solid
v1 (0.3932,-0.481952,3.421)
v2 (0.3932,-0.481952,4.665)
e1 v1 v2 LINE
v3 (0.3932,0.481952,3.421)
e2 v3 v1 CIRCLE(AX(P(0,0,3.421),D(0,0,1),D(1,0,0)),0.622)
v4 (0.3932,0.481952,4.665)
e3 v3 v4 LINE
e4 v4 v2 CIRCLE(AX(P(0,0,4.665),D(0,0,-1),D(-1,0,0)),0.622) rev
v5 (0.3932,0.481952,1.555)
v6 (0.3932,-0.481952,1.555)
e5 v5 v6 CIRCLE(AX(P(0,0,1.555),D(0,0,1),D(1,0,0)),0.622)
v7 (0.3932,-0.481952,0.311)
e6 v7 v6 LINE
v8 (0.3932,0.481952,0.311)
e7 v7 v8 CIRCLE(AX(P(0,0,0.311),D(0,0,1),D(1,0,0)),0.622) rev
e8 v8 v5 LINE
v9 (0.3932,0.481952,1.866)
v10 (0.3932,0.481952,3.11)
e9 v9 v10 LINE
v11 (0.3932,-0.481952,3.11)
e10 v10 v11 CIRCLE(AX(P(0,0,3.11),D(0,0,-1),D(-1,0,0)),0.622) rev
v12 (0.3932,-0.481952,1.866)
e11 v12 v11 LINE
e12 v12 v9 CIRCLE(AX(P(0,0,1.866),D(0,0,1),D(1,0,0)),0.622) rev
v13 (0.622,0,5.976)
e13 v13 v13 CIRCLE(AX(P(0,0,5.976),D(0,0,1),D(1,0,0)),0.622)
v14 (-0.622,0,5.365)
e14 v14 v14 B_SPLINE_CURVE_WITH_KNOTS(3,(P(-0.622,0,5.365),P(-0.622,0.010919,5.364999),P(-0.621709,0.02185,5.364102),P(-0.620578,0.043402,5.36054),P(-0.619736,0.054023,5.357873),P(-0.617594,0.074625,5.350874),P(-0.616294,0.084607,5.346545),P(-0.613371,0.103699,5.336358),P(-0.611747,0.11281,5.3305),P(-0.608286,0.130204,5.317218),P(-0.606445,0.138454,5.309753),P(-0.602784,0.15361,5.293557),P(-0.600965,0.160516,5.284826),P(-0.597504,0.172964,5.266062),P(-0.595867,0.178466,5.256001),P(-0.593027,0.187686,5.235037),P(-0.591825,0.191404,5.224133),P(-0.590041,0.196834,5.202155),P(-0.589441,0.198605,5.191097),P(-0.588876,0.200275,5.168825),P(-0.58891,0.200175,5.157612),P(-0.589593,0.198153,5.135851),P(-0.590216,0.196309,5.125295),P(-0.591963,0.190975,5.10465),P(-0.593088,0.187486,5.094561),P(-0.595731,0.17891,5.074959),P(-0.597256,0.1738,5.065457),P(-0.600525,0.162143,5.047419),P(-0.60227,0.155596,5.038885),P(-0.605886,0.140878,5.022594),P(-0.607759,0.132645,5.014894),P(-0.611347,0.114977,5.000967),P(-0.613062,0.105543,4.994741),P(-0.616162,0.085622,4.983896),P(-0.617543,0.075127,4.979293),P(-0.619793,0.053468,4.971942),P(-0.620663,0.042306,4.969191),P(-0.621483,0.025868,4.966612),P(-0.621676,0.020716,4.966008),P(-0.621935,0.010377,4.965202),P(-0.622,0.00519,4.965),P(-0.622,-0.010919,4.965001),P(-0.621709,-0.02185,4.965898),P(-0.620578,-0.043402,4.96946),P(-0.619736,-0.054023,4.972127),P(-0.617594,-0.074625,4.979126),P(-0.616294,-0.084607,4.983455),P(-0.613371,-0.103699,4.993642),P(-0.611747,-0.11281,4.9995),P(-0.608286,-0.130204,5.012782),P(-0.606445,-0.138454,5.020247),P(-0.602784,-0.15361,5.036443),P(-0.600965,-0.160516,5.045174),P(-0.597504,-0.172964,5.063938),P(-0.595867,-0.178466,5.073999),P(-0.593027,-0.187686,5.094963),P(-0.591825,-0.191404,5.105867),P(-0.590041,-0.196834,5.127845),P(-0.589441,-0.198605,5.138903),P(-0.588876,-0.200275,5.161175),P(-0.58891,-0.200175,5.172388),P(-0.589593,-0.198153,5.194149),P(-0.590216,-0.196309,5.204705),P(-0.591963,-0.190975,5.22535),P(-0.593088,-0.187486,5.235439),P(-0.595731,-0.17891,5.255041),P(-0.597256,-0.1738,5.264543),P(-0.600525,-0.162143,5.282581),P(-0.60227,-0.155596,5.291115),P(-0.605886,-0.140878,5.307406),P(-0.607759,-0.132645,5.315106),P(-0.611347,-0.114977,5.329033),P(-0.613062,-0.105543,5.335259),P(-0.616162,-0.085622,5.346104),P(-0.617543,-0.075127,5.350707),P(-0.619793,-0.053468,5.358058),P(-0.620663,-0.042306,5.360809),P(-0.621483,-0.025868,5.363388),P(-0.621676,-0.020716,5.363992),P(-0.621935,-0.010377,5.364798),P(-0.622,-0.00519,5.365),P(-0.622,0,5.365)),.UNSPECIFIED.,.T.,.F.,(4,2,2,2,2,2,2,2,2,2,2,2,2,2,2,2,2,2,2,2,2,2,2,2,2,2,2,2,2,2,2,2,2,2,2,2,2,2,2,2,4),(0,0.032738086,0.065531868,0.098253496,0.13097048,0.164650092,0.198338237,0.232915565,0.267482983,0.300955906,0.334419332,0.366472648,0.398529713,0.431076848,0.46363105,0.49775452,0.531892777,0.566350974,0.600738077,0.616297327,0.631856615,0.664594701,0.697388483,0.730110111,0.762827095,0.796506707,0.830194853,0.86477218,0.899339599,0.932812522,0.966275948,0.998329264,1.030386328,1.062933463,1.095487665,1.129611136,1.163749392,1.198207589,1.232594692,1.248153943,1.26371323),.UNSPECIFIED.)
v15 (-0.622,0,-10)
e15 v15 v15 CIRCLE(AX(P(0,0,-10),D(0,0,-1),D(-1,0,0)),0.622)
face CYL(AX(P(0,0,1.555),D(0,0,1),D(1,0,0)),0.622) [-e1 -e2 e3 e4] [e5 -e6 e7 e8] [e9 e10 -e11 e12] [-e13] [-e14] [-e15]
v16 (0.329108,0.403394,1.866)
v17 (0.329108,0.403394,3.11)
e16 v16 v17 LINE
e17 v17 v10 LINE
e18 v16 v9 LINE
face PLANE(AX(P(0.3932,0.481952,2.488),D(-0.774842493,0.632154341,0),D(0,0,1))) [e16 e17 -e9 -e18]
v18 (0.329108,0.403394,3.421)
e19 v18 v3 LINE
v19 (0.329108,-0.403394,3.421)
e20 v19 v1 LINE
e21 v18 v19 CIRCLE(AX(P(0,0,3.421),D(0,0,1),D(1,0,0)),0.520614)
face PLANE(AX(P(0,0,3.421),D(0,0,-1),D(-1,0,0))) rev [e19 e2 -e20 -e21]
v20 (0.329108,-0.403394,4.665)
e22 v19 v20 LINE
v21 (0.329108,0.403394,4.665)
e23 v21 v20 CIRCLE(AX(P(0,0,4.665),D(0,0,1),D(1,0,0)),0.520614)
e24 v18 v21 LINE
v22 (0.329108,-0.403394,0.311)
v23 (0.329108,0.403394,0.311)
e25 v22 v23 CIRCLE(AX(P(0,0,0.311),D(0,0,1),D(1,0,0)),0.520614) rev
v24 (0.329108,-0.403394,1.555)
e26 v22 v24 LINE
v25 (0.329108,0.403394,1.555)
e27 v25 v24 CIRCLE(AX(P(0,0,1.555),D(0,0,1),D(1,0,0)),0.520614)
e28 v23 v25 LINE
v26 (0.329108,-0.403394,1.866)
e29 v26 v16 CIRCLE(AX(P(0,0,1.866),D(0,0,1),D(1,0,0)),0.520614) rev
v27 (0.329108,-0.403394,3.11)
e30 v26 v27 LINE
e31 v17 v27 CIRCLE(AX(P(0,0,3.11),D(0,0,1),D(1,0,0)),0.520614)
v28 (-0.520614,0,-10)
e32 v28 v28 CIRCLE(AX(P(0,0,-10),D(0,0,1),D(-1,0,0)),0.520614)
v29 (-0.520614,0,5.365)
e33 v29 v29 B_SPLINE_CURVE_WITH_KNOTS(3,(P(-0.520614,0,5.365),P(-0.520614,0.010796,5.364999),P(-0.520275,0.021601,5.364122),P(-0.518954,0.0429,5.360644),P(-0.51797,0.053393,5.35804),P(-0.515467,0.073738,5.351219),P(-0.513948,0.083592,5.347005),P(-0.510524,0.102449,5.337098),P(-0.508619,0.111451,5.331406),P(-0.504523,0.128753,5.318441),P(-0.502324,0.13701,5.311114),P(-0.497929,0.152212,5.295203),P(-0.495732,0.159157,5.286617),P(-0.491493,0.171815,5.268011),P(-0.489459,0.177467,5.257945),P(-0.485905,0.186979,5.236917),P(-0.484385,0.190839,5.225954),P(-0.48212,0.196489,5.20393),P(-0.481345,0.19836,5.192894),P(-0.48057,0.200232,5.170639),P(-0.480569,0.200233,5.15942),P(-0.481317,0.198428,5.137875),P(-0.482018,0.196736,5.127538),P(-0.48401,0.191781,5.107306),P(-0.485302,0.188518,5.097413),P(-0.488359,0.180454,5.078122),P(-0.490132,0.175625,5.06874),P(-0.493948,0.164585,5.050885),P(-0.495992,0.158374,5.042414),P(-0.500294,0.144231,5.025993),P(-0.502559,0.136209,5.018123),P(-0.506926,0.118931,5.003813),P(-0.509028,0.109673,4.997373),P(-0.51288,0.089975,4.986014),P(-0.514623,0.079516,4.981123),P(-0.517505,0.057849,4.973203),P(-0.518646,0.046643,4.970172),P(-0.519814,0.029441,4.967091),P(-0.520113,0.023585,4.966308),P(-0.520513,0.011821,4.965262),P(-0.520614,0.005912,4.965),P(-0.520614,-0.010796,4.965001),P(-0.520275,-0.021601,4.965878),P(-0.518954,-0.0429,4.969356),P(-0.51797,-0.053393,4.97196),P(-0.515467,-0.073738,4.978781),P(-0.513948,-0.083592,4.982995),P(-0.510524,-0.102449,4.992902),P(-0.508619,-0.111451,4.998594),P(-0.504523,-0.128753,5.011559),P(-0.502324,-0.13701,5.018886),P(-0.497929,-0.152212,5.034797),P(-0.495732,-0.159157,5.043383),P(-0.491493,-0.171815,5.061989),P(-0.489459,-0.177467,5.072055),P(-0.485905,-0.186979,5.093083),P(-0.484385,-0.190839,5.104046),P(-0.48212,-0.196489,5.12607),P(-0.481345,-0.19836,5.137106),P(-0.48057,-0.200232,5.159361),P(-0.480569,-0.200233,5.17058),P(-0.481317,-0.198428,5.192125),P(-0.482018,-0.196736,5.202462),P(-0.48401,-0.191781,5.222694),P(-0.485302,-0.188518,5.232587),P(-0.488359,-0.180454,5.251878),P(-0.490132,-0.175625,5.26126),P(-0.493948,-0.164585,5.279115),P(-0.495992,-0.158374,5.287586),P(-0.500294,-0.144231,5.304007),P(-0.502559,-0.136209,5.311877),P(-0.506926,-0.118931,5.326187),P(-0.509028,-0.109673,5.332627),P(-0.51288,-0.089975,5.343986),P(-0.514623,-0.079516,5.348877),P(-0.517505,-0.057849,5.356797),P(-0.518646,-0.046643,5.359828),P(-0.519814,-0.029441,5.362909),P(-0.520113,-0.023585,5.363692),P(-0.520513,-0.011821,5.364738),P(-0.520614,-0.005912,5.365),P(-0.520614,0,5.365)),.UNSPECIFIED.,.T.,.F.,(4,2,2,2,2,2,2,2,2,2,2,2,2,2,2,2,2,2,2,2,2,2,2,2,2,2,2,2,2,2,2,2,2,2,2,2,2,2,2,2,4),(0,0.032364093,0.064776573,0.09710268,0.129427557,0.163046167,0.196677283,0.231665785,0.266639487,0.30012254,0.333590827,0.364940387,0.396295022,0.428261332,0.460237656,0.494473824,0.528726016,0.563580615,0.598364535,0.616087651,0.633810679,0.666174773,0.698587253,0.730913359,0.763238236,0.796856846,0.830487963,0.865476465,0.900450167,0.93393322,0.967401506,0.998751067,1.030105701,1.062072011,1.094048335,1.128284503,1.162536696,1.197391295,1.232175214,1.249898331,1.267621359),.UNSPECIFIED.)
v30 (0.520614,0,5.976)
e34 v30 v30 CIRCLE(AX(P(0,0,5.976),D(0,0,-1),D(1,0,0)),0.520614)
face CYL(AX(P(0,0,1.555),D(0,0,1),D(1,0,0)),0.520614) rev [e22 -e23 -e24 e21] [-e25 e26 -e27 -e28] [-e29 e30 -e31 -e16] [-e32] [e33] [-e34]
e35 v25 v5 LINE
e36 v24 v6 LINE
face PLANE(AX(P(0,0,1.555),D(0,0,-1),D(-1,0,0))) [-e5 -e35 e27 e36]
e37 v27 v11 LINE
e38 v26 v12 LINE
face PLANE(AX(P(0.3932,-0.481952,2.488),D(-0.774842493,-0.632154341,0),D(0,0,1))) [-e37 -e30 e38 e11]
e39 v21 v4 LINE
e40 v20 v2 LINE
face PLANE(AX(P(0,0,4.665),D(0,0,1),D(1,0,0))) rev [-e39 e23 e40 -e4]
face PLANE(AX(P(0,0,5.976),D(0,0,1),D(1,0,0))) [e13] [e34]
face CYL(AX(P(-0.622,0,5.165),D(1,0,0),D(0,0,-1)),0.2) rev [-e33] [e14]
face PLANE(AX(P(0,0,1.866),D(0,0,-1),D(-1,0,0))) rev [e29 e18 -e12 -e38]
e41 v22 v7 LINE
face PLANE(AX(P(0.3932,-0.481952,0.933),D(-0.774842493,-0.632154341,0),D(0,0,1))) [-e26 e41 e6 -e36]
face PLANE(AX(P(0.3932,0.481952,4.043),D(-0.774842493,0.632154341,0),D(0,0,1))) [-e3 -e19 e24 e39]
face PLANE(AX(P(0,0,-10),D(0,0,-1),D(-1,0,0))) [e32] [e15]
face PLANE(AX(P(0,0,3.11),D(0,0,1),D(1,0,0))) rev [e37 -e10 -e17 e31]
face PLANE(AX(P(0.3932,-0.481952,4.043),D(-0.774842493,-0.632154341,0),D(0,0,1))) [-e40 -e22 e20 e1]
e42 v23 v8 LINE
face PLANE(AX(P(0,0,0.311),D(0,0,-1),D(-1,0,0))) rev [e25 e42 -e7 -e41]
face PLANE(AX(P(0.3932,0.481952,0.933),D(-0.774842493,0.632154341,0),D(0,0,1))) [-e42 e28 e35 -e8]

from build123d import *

# Parameters (mm, degrees)
SURFACE_EXTRUDE1_1_DEPTH   = 1.866
SURFACE_TRIM1_TOOL_2_BACK  = 3.327
SURFACE_TRIM1_TOOL_2_DEPTH = 6.654
THICKEN2_T1                = 0.101386
LPATTERN3_COUNT            = 3
LPATTERN3_PITCH            = 1.555
BOSS_EXTRUDE1_DEPTH        = 10
BOSS_EXTRUDE2_DEPTH        = 1
SKETCH7_R                  = 0.2
CUT_EXTRUDE2_DEPTH         = 11.038613849


with BuildPart() as body_1:
    # Surface-Extrude1: a surface, the sketch's curves swept straight by 1.866 mm
    with BuildLine(Plane.XY, mode=Mode.PRIVATE) as surface_extrude1_1_path:
        ThreePointArc((0.622, 0), (0, 0.622), (-0.622, 0))
    surface_extrude1_1 = Shell.extrude(surface_extrude1_1_path.wire(), (0 * SURFACE_EXTRUDE1_1_DEPTH, 0 * SURFACE_EXTRUDE1_1_DEPTH, 1 * SURFACE_EXTRUDE1_1_DEPTH))
    # Surface-Trim1 tool: a surface, the sketch's curves swept straight by 6.654 mm
    with BuildLine(Plane(origin=(0, 0, 0), x_dir=(1, 0, 0), z_dir=(0, 1, 0)).offset(-SURFACE_TRIM1_TOOL_2_BACK), mode=Mode.PRIVATE) as surface_trim1_tool_2_path:
        Line((-0.622, -1.555), (0.3932, -1.555))
        Line((0.3932, -1.555), (0.3932, -0.311))
        Line((0.3932, -0.311), (-0.622, -0.311))
    surface_trim1_tool_2 = Shell.extrude(surface_trim1_tool_2_path.wire(), (0 * SURFACE_TRIM1_TOOL_2_DEPTH, 1 * SURFACE_TRIM1_TOOL_2_DEPTH, 0 * SURFACE_TRIM1_TOOL_2_DEPTH))
    # Surface-Trim1: the surface trimmed, the side behind the tool kept
    surface_trim1_3 = split(surface_extrude1_1.faces()[0], bisect_by=surface_trim1_tool_2, keep=Keep.BOTTOM).faces()[0]
    add(Solid.thicken(surface_trim1_3, THICKEN2_T1))


with BuildPart() as lpattern3_1:
    # LPattern3: pattern copy
    add(body_1.part.moved(Location(Vector(0, 0, 1) * (1 * LPATTERN3_PITCH))))


with BuildPart() as lpattern3_2:
    # LPattern3: pattern copy
    add(body_1.part.moved(Location(Vector(0, 0, 1) * (2 * LPATTERN3_PITCH))))


with BuildPart() as body_1_1:
    add(body_1.part)

    # Combine1: read off the stored shape, not the designer's step
    # Combine1: union LPattern3_2, LPattern3_1
    add(lpattern3_2.part)
    add(lpattern3_1.part)

    # Sketch5 → Boss-Extrude1 (add)
    with BuildSketch(Plane(origin=(0, 0, 0), x_dir=(-1, 0, 0), z_dir=(0, 0, -1))):
        with BuildLine():
            Line((-0.622, 0), (-0.520614, 0))
            ThreePointArc((-0.520614, 0), (0, 0.520614), (0.520614, 0))
            Line((0.520614, 0), (0.622, 0))
            ThreePointArc((0.622, 0), (0, 0.622), (-0.622, 0))
        make_face()
    extrude(amount=BOSS_EXTRUDE1_DEPTH)

    # Sketch6 → Boss-Extrude2 (add)
    with BuildSketch(Plane.XY.offset(4.976)):
        with BuildLine():
            Line((-0.622, 0), (-0.520614, 0))
            ThreePointArc((-0.520614, 0), (0, 0.520614), (0.520614, 0))
            Line((0.520614, 0), (0.622, 0))
            ThreePointArc((0.622, 0), (0, 0.622), (-0.622, 0))
        make_face()
    extrude(amount=BOSS_EXTRUDE2_DEPTH)

    # Sketch7 → Cut-Extrude2 (cut, through all)
    with BuildSketch(Plane(origin=(0, 0, 0), x_dir=(0, 0, -1), z_dir=(1, 0, 0))):
        with Locations((-5.165, 0)):
            Circle(SKETCH7_R)
    extrude(amount=-CUT_EXTRUDE2_DEPTH, mode=Mode.SUBTRACT)

    # Mirror1: body 1 across face


with BuildPart() as body_1_2:
    add(body_1_1.part)
    add(body_1_1.part.mirror(Plane(origin=(0.571307, 0, -2.012), x_dir=(0, 0, 1), z_dir=(0, -1, 0))))


solid = body_1_2.part
